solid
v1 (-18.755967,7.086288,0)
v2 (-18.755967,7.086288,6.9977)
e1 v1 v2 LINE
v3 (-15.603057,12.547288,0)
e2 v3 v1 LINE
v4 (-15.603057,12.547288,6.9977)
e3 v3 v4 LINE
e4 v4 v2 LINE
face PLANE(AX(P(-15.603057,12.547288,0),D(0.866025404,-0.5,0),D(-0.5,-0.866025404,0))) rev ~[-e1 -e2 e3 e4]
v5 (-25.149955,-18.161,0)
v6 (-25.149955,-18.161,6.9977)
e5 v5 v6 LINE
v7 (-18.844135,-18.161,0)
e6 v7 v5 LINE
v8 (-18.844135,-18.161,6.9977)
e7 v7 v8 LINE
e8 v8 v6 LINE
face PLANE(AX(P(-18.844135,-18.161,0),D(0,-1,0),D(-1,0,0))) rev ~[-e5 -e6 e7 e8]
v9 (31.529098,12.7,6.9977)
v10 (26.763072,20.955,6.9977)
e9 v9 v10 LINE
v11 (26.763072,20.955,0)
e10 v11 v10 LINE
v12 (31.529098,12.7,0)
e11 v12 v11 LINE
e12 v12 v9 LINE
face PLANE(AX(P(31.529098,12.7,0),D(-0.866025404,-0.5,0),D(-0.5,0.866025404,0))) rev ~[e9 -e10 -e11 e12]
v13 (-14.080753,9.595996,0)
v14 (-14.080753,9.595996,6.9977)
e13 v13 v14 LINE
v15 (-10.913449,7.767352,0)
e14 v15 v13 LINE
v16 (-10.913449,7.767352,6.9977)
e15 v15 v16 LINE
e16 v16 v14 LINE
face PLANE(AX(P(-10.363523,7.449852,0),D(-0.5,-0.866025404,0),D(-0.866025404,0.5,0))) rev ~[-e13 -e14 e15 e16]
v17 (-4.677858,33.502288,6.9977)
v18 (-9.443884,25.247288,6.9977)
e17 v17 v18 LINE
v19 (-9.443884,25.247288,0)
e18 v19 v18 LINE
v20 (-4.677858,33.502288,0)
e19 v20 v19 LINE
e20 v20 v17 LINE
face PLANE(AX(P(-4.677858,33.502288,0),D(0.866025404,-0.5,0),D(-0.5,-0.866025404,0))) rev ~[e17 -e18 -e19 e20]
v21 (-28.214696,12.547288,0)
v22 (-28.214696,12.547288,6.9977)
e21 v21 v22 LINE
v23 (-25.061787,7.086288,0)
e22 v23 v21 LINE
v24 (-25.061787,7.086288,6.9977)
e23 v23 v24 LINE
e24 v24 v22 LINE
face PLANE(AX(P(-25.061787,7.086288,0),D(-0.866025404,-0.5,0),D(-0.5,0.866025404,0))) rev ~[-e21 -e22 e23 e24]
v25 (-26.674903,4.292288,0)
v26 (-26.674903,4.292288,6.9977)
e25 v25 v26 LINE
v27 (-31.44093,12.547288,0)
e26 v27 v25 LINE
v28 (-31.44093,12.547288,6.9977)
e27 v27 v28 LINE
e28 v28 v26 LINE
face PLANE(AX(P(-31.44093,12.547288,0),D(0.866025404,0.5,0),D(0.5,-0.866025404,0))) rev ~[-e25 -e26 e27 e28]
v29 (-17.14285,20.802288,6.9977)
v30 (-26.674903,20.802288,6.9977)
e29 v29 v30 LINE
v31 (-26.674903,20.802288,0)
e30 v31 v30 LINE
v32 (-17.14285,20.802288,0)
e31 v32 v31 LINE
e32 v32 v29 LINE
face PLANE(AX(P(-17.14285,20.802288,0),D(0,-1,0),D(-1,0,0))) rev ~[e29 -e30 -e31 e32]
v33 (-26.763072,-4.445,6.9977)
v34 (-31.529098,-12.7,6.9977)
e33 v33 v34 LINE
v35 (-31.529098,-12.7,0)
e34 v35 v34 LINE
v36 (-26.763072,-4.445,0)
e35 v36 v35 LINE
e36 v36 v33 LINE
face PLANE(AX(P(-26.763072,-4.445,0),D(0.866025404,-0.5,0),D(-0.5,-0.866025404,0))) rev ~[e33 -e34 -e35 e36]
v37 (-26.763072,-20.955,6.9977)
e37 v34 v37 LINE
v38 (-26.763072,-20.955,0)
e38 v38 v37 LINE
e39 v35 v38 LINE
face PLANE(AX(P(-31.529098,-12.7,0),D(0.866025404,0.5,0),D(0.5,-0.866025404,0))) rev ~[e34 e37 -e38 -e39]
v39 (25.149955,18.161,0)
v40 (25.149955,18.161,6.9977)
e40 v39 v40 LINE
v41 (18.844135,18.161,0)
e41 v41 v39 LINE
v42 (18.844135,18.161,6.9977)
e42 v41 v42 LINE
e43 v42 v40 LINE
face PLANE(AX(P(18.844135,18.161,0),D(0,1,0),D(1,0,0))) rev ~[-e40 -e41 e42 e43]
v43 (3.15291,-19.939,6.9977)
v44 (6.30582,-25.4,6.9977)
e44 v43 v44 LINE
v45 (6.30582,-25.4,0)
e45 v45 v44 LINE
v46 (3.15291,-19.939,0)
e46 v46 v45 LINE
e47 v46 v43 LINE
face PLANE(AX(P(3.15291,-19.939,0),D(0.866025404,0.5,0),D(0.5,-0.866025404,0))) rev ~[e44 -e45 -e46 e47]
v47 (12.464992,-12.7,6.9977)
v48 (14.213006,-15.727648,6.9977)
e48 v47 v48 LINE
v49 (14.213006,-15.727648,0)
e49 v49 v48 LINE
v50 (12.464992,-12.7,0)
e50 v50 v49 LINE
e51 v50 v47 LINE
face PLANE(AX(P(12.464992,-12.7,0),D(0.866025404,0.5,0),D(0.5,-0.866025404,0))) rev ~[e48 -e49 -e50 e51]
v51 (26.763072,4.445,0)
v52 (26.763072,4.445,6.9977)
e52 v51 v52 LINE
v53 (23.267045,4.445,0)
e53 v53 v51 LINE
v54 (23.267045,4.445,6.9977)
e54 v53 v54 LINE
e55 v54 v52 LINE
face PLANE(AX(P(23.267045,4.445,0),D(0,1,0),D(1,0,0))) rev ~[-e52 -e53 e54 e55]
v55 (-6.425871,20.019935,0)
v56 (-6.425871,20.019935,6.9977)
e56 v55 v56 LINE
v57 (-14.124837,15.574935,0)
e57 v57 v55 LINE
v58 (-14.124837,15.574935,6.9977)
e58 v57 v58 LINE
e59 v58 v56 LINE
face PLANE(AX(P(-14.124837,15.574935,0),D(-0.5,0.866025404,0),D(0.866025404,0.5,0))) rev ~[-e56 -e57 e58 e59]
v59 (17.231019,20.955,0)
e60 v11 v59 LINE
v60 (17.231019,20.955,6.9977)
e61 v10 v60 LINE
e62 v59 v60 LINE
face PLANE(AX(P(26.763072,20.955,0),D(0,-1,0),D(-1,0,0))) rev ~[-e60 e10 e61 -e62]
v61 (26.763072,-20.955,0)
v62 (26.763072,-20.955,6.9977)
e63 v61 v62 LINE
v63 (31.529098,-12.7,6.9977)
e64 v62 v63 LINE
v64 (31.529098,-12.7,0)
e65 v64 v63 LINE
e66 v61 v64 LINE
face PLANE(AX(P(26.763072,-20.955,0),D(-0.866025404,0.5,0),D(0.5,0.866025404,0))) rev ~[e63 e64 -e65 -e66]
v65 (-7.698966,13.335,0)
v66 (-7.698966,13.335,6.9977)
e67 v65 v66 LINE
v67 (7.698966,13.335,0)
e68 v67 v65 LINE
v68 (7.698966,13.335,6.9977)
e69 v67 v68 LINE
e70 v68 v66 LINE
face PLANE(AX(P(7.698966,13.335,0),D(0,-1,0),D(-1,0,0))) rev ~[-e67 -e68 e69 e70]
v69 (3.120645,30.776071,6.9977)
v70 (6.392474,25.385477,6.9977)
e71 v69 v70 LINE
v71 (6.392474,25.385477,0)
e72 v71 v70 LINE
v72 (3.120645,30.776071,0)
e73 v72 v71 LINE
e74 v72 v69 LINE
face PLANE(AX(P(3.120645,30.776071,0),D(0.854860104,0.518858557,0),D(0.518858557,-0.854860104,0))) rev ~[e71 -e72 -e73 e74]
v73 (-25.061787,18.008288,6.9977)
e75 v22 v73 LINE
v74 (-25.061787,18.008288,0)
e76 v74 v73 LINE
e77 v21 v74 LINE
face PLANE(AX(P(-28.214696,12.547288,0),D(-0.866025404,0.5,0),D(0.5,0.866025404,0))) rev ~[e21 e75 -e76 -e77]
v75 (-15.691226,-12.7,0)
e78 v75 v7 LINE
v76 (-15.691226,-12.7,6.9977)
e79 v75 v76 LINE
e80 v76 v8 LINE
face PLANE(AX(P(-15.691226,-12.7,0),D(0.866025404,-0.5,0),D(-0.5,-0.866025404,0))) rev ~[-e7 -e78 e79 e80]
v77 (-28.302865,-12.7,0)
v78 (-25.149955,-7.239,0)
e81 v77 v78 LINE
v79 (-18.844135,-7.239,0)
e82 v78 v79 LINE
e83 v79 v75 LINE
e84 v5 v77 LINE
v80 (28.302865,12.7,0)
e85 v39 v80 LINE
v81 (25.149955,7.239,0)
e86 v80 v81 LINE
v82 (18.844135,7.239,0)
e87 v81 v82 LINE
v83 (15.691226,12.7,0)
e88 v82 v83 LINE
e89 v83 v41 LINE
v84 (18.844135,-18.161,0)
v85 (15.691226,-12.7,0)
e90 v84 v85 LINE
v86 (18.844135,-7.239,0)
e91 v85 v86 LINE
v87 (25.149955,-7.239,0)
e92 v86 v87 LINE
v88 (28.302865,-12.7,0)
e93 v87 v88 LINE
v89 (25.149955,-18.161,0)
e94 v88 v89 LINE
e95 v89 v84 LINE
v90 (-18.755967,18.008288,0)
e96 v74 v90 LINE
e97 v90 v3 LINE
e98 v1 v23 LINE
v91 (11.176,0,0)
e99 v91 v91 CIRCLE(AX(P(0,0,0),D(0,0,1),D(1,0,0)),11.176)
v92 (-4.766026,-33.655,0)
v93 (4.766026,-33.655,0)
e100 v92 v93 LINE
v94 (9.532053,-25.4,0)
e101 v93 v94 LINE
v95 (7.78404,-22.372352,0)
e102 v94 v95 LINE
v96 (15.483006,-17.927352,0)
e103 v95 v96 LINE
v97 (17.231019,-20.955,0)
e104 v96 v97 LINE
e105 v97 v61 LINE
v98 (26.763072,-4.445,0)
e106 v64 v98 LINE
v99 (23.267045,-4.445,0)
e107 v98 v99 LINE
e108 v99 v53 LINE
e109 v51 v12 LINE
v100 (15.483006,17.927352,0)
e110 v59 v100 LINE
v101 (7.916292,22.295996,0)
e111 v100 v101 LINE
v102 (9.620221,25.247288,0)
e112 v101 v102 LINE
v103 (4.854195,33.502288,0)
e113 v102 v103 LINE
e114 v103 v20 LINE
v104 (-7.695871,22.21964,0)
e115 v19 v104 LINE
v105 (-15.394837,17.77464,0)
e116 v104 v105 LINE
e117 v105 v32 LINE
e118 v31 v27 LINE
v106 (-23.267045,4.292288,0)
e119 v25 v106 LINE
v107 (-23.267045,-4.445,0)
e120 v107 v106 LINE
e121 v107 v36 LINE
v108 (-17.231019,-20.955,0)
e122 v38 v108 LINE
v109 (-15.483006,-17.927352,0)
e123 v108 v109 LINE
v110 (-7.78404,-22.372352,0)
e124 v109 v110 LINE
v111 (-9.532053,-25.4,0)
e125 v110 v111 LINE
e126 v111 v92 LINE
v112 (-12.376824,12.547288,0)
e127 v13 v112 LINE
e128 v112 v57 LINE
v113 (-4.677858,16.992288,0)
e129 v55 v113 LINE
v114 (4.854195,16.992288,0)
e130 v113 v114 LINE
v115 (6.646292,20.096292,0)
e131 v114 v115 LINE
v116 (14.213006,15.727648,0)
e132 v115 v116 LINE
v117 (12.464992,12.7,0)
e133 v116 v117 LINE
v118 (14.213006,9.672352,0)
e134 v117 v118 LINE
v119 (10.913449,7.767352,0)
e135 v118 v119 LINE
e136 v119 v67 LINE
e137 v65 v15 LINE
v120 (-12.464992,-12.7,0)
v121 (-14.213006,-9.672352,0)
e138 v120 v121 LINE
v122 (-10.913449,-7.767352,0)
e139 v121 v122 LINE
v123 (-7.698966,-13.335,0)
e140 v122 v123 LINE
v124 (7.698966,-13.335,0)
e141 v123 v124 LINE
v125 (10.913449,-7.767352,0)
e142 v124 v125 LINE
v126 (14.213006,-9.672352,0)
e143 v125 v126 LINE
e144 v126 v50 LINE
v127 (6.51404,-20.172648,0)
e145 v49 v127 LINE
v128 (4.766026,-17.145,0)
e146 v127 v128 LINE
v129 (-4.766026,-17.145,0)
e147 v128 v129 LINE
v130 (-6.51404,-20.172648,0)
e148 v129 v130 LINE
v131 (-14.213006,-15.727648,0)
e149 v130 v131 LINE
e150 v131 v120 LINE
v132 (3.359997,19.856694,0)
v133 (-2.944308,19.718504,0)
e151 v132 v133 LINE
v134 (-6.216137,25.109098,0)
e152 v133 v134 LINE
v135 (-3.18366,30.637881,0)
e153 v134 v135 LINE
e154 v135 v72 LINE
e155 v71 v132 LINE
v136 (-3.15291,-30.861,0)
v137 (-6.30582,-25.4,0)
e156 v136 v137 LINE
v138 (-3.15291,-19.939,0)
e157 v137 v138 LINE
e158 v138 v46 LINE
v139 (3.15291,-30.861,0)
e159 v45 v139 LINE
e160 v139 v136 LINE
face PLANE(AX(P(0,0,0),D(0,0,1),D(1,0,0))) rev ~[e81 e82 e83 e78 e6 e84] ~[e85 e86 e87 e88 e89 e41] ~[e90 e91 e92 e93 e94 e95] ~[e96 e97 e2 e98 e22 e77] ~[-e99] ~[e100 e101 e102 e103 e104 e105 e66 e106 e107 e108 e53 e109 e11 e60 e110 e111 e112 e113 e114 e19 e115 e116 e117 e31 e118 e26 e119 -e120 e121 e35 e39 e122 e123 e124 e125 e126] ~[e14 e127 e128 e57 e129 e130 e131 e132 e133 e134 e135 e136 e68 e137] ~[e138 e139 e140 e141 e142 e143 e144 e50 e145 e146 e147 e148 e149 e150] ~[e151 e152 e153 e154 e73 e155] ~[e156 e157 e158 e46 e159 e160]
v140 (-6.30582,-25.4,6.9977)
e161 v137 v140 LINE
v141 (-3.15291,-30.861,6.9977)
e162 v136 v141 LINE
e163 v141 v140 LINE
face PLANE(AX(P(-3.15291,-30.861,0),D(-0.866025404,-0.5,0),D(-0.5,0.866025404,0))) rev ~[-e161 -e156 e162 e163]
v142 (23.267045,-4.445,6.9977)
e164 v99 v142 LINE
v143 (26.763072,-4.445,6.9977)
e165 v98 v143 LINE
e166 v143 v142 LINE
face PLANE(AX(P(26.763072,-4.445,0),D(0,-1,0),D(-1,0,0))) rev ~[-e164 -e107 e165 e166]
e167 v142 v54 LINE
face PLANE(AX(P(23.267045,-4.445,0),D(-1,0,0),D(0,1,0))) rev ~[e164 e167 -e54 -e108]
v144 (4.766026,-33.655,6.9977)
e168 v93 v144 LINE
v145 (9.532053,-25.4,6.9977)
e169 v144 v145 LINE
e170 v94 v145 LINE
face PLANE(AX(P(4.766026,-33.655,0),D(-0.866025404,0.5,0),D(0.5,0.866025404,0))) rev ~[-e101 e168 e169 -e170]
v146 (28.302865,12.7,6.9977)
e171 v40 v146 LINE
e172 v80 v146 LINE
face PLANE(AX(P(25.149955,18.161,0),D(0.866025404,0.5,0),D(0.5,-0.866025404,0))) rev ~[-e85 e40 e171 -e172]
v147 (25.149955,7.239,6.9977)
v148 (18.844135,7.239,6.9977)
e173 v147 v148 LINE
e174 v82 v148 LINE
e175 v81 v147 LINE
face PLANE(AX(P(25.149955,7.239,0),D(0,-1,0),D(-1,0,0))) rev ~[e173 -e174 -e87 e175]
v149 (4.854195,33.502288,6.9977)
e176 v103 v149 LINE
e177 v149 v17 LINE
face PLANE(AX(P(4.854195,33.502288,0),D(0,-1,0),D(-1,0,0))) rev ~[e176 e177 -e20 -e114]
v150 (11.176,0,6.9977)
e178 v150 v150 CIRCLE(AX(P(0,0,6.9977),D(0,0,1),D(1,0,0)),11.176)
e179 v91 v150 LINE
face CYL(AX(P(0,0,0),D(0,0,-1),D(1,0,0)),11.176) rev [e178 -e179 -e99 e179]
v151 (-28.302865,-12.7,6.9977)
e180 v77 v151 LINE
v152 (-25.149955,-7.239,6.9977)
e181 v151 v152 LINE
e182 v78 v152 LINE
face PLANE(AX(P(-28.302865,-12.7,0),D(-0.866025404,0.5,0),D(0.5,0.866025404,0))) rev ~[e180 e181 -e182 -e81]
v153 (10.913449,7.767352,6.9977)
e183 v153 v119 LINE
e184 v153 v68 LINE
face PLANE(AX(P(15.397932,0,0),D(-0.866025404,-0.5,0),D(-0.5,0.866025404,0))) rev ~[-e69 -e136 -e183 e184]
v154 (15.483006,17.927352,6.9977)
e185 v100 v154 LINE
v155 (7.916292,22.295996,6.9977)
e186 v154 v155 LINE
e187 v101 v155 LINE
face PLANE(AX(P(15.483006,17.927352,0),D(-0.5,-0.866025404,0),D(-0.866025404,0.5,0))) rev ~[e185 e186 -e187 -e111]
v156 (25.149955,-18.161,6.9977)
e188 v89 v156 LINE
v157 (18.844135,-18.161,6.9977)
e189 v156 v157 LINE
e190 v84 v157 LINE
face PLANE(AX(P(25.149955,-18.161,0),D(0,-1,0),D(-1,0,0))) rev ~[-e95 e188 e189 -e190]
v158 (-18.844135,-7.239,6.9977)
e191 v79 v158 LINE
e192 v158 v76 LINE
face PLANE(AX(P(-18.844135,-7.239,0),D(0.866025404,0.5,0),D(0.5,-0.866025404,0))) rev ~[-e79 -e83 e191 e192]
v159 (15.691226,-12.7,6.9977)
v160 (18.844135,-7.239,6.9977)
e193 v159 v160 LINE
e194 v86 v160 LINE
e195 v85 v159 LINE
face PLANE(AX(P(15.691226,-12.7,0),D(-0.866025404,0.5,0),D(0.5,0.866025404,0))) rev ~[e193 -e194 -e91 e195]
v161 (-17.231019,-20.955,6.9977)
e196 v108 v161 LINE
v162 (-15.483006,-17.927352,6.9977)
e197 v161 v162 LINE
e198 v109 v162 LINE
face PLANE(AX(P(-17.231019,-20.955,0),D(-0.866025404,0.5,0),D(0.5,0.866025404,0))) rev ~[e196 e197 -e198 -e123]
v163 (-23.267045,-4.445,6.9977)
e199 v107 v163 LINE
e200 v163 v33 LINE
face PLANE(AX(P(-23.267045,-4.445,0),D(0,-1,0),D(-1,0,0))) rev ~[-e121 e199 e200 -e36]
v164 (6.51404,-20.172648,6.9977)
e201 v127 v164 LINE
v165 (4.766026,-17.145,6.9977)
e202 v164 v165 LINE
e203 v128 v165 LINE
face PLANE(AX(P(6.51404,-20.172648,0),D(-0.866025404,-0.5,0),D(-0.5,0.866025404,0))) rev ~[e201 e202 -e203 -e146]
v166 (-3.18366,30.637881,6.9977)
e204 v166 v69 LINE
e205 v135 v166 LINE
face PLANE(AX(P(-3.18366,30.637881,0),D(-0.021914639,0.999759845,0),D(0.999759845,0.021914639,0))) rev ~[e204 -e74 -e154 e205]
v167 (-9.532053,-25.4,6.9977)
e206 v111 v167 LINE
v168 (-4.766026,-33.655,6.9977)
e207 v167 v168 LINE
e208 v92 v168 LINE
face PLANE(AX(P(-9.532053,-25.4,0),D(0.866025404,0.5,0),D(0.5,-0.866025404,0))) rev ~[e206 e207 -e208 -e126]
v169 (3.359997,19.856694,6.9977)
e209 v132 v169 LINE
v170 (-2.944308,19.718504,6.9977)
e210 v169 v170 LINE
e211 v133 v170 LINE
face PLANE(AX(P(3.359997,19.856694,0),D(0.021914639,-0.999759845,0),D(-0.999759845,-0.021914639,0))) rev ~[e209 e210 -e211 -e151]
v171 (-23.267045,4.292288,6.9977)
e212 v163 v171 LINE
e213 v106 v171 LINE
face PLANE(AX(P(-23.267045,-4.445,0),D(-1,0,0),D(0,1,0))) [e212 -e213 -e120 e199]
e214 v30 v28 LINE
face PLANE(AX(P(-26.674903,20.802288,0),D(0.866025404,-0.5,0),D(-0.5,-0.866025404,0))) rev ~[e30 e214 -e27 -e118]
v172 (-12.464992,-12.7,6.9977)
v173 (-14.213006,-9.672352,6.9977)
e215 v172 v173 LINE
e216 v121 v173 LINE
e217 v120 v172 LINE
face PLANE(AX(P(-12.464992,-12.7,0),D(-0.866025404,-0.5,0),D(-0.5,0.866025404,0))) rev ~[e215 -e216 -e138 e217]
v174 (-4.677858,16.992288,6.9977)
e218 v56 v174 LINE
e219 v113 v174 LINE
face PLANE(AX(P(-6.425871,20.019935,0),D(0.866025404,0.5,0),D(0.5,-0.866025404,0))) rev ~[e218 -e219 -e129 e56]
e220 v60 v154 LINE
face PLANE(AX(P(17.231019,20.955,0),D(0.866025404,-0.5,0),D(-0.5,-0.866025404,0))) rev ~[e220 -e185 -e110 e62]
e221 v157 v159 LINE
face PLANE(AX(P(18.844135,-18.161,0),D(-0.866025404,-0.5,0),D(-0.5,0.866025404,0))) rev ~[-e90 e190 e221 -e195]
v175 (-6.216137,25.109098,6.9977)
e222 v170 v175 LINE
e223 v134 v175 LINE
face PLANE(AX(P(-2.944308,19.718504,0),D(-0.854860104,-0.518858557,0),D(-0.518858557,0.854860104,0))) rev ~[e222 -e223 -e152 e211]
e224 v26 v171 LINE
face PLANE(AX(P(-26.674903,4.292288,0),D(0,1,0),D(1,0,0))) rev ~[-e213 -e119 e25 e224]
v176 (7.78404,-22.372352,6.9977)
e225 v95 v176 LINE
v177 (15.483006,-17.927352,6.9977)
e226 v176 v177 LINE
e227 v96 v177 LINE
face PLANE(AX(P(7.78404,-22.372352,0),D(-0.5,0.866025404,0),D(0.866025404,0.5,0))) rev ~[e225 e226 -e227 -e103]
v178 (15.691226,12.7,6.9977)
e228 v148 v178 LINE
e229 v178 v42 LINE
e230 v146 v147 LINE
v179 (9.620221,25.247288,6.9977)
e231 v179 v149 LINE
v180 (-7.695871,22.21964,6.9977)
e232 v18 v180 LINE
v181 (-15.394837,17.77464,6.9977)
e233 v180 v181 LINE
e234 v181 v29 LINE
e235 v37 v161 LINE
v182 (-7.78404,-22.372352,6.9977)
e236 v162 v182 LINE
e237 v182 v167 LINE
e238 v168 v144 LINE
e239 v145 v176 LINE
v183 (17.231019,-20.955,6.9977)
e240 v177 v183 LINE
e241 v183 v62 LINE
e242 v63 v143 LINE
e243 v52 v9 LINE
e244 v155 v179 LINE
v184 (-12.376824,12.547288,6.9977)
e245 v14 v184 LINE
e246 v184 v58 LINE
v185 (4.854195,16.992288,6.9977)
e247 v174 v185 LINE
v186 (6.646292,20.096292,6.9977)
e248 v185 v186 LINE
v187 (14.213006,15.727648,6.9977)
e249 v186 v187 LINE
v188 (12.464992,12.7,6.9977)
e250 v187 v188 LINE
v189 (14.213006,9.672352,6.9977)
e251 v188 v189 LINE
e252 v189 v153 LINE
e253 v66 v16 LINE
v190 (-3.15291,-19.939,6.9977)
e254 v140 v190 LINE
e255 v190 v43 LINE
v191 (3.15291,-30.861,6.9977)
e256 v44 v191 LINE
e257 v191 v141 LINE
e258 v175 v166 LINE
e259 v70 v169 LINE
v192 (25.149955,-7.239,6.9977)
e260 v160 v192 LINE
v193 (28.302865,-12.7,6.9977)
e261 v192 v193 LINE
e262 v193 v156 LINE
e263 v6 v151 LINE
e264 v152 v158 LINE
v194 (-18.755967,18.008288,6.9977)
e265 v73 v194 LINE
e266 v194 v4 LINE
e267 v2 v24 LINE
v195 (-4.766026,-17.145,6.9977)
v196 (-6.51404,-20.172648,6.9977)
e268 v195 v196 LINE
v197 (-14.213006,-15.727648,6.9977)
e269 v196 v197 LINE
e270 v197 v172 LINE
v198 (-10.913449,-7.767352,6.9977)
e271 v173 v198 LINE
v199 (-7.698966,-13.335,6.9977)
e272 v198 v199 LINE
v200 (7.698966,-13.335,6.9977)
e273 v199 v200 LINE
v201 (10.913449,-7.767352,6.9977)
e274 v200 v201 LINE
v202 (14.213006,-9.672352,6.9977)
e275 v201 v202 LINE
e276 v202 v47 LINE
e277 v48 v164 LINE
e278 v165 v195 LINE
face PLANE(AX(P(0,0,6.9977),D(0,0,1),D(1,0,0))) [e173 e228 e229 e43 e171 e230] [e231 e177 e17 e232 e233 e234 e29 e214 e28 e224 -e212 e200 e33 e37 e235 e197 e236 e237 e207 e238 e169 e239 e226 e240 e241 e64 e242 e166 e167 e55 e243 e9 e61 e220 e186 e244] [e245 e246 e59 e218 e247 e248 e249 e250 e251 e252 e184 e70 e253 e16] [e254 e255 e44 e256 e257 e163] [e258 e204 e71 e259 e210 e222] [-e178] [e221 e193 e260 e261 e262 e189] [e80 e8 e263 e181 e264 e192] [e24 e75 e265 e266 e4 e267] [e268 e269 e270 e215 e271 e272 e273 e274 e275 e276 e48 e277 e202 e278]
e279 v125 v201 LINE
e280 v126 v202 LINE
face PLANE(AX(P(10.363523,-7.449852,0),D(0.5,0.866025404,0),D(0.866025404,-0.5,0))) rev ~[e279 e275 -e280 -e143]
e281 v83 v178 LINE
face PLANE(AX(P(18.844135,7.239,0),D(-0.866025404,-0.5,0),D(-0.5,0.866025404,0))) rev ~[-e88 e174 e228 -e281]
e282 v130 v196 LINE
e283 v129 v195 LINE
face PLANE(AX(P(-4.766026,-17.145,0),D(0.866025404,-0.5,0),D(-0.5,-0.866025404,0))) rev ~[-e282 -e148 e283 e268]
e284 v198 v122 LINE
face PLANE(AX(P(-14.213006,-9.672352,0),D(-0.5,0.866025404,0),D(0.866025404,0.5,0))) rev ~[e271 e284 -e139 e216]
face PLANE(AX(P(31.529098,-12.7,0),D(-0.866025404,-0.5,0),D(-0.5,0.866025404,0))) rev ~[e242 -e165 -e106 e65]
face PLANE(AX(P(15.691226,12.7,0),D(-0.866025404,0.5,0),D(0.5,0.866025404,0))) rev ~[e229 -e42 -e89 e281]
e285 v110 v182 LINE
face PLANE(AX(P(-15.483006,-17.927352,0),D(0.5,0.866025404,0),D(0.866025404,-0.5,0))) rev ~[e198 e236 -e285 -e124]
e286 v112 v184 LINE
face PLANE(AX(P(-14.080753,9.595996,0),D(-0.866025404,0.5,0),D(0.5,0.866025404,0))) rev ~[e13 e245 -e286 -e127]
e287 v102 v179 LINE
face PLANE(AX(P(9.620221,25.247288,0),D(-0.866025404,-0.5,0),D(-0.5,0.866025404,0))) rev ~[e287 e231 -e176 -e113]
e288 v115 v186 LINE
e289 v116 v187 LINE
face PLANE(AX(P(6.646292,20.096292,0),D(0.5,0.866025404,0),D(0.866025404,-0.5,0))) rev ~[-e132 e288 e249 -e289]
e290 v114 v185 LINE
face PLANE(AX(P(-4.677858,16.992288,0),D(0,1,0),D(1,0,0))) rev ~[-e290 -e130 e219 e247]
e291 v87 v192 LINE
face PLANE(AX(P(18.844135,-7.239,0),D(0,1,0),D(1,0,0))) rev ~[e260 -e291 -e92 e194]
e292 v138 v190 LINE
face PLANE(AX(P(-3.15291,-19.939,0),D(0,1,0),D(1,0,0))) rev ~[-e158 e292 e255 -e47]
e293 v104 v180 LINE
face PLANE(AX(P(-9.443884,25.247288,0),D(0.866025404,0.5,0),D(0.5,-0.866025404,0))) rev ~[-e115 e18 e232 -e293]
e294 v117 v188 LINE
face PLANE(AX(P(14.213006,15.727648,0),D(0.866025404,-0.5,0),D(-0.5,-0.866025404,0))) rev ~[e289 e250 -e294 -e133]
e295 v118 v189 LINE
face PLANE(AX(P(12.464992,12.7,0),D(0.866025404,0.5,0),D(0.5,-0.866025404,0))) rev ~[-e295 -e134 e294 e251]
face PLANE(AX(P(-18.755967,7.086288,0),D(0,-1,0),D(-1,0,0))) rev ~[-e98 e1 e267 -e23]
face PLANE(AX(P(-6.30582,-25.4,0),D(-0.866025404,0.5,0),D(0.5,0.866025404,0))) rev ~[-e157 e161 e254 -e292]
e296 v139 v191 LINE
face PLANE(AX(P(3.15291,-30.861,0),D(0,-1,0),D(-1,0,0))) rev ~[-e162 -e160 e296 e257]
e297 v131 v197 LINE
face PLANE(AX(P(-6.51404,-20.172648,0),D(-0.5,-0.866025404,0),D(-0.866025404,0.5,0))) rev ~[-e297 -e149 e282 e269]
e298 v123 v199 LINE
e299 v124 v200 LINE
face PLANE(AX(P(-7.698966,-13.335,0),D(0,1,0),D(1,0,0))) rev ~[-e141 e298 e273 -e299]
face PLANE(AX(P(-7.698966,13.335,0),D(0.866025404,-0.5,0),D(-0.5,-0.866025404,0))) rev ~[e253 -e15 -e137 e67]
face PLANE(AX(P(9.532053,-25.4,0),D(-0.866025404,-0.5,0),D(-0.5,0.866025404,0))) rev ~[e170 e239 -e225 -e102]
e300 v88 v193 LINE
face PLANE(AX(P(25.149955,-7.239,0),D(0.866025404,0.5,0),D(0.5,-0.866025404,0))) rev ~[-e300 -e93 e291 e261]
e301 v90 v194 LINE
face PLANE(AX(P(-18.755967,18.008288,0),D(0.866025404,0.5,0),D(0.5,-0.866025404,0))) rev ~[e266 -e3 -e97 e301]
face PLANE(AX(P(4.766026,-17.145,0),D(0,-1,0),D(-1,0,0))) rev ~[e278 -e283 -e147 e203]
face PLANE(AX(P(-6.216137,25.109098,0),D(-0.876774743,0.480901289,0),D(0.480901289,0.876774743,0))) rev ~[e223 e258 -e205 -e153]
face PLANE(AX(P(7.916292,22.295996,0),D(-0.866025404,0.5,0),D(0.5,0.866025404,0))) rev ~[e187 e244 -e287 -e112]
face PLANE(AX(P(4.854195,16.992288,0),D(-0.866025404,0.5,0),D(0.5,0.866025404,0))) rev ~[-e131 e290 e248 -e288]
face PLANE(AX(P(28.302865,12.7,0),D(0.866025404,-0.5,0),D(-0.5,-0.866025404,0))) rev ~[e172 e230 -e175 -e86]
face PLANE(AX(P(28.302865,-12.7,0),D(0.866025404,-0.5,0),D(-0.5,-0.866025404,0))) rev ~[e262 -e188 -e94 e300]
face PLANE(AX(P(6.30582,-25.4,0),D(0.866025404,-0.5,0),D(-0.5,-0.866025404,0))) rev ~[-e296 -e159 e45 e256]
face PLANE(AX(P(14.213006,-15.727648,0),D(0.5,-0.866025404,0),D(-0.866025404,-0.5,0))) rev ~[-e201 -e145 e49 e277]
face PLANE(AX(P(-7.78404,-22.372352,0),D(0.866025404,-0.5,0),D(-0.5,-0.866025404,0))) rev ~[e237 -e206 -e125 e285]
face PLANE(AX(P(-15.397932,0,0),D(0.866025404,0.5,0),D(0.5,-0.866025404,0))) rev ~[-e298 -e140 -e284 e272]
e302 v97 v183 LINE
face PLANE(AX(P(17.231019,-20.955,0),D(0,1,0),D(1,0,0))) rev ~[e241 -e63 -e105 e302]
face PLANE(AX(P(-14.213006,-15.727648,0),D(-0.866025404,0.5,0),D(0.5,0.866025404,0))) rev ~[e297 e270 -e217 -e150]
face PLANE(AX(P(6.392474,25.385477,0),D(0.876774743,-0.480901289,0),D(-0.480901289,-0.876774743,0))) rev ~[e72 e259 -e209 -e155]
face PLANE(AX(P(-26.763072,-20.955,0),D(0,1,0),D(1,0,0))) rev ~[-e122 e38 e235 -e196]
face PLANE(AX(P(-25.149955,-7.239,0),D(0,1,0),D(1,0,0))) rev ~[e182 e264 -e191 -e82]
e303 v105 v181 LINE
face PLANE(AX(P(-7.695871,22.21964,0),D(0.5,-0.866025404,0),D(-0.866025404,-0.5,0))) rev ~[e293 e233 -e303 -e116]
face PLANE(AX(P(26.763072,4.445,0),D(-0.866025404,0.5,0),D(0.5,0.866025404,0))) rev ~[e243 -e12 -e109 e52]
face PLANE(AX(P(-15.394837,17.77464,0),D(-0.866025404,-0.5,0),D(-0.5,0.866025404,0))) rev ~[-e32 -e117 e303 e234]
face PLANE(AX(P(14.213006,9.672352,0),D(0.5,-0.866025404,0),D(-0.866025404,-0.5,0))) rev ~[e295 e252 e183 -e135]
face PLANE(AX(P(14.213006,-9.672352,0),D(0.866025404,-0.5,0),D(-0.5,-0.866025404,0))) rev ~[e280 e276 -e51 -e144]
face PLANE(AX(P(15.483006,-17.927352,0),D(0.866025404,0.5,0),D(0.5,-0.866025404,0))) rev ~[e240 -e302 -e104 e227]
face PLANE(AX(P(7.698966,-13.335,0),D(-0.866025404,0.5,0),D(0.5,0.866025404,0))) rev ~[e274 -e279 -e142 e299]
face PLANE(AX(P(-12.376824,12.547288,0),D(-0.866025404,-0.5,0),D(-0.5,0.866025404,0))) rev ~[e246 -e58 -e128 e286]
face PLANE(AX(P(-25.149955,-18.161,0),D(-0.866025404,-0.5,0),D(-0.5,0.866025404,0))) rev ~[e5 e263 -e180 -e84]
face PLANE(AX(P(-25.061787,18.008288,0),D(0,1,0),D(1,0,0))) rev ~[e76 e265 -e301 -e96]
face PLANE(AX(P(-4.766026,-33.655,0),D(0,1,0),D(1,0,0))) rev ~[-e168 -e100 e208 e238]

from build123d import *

# Parameters (mm, degrees)
F0_W     = 2.54
F0_H     = 8.7372876405
F0_H_2   = 8.89
F1_DEPTH = 6.9977
F2_R     = 11.176
F3_DEPTH = 6.9977


with BuildPart() as f1:
    # F0 (on Top) → F1 (new body)
    with BuildSketch(Plane.XY):
        Polygon((-11.6335226281, 5.2501477372), (-10.3635226281, 7.4498522628), (-14.0807527651, 9.595996083), (-15.3507527651, 7.3962915574), align=None)
        Polygon((-14.6646968374, 0), (-11.6335226281, 5.2501477372), (-15.3507527651, 7.3962915574), (-17.1428502621, 4.2922876405), (-20.7270452561, 4.2922876405), (-20.7270452561, -4.445), (-17.231018784, -4.445), (-15.4830055479, -7.4726477372), (-11.6335226281, -5.2501477372), align=None)
        Polygon((-15.3507527651, 7.3962915574), (-14.0807527651, 9.595996083), (-12.3768237899, 12.5472876405), (-14.124837026, 15.5749353777), (-14.2130055479, 15.7276477372), (-15.394837026, 17.7746399033), (-17.1428502621, 20.8022876405), (-26.6749032064, 20.8022876405), (-31.4409296786, 12.5472876405), (-26.6749032064, 4.2922876405), (-23.2670452561, 4.2922876405), (-20.7270452561, 4.2922876405), (-17.1428502621, 4.2922876405), align=None)
        Polygon((-18.7559669142, 18.0082876405), (-15.6030570942, 12.5472876405), (-18.7559669142, 7.0862876405), (-25.0617865543, 7.0862876405), (-28.2146963743, 12.5472876405), (-25.0617865543, 18.0082876405), align=None, mode=Mode.SUBTRACT)
        Polygon((14.2130055479, 9.6723522628), (10.3635226281, 7.4498522628), (11.6335226281, 5.2501477372), (15.4830055479, 7.4726477372), align=None)
        Polygon((-10.3635226281, -7.4498522628), (-11.6335226281, -5.2501477372), (-15.4830055479, -7.4726477372), (-14.2130055479, -9.6723522628), align=None)
        Polygon((-14.2130055479, 15.7276477372), (-14.124837026, 15.5749353777), (-6.4258711864, 20.0199353777), (-7.6958711864, 22.2196399033), (-15.394837026, 17.7746399033), align=None)
        Polygon((15.4830055479, 7.4726477372), (11.6335226281, 5.2501477372), (14.6646968374, 0), (11.6335226281, -5.2501477372), (15.4830055479, -7.4726477372), (17.231018784, -4.445), (20.7270452561, -4.445), (20.7270452561, 4.445), (17.231018784, 4.445), align=None)
        Polygon((12.4649923118, 12.7), (14.2130055479, 9.6723522628), (15.4830055479, 7.4726477372), (17.231018784, 4.445), (20.7270452561, 4.445), (23.2670452561, 4.445), (26.7630717283, 4.445), (31.5290982004, 12.7), (26.7630717283, 20.955), (17.231018784, 20.955), (15.4830055479, 17.9273522628), (14.2130055479, 15.7276477372), align=None)
        Polygon((25.1499550762, 7.239), (18.8441354361, 7.239), (15.691225616, 12.7), (18.8441354361, 18.161), (25.1499550762, 18.161), (28.3028648962, 12.7), align=None, mode=Mode.SUBTRACT)
        Polygon((-14.2130055479, -9.6723522628), (-15.4830055479, -7.4726477372), (-17.231018784, -4.445), (-20.7270452561, -4.445), (-23.2670452561, -4.445), (-26.7630717283, -4.445), (-31.5290982004, -12.7), (-26.7630717283, -20.955), (-17.231018784, -20.955), (-15.4830055479, -17.9273522628), (-14.2130055479, -15.7276477372), (-12.4649923118, -12.7), align=None)
        Polygon((-25.1499550762, -7.239), (-18.8441354361, -7.239), (-15.691225616, -12.7), (-18.8441354361, -18.161), (-25.1499550762, -18.161), (-28.3028648962, -12.7), align=None, mode=Mode.SUBTRACT)
        with Locations((-21.9970452561, -0.0763561798)):
            Rectangle(F0_W, F0_H)
        Polygon((-7.6958711864, 22.2196399033), (-6.4258711864, 20.0199353777), (-4.6778579503, 16.9922876405), (-1.27, 16.9922876405), (1.27, 16.9922876405), (4.854194994, 16.9922876405), (6.6462924911, 20.0962915574), (7.9162924911, 22.295996083), (9.6202214662, 25.2472876405), (4.854194994, 33.5022876405), (-4.6778579503, 33.5022876405), (-9.4438844224, 25.2472876405), align=None)
        Polygon((6.3924737908, 25.3854774003), (3.3599969989, 19.8566940043), (-2.94430827, 19.7185042444), (-6.216136747, 25.1090978806), (-3.1836599552, 30.6378812766), (3.1206453137, 30.7760710365), align=None, mode=Mode.SUBTRACT)
        Polygon((15.4830055479, -7.4726477372), (11.6335226281, -5.2501477372), (10.3635226281, -7.4498522628), (14.2130055479, -9.6723522628), align=None)
        Polygon((6.6462924911, 20.0962915574), (14.2130055479, 15.7276477372), (15.4830055479, 17.9273522628), (7.9162924911, 22.295996083), align=None)
        Polygon((17.231018784, -4.445), (15.4830055479, -7.4726477372), (14.2130055479, -9.6723522628), (12.4649923118, -12.7), (14.2130055479, -15.7276477372), (15.4830055479, -17.9273522628), (17.231018784, -20.955), (26.7630717283, -20.955), (31.5290982004, -12.7), (26.7630717283, -4.445), (23.2670452561, -4.445), (20.7270452561, -4.445), align=None)
        Polygon((18.8441354361, -18.161), (15.691225616, -12.7), (18.8441354361, -7.239), (25.1499550762, -7.239), (28.3028648962, -12.7), (25.1499550762, -18.161), align=None, mode=Mode.SUBTRACT)
        with Locations((21.9970452561, 0)):
            Rectangle(F0_W, F0_H_2)
        Polygon((-6.5140397082, -20.1726477372), (-14.2130055479, -15.7276477372), (-15.4830055479, -17.9273522628), (-7.7840397082, -22.3723522628), align=None)
        Polygon((-4.7660264722, -17.145), (-6.5140397082, -20.1726477372), (-7.7840397082, -22.3723522628), (-9.5320529443, -25.4), (-4.7660264722, -33.655), (4.7660264722, -33.655), (9.5320529443, -25.4), (7.7840397082, -22.3723522628), (6.5140397082, -20.1726477372), (4.7660264722, -17.145), (1.27, -17.145), (-1.27, -17.145), align=None)
        Polygon((-6.3058196401, -25.4), (-3.15290982, -19.939), (3.15290982, -19.939), (6.3058196401, -25.4), (3.15290982, -30.861), (-3.15290982, -30.861), align=None, mode=Mode.SUBTRACT)
        Polygon((15.4830055479, -17.9273522628), (14.2130055479, -15.7276477372), (6.5140397082, -20.1726477372), (7.7840397082, -22.3723522628), align=None)
    extrude(amount=F1_DEPTH)

    # F2 (on Top) → F3 (join)
    with BuildSketch(Plane.XY):
        Polygon((7.6989658396, 13.335), (-7.6989658396, 13.335), (-15.3979316793, 0), (-7.6989658396, -13.335), (7.6989658396, -13.335), (15.3979316793, 0), align=None)
        Circle(F2_R, mode=Mode.SUBTRACT)
    extrude(amount=F3_DEPTH)


solid = f1.part
